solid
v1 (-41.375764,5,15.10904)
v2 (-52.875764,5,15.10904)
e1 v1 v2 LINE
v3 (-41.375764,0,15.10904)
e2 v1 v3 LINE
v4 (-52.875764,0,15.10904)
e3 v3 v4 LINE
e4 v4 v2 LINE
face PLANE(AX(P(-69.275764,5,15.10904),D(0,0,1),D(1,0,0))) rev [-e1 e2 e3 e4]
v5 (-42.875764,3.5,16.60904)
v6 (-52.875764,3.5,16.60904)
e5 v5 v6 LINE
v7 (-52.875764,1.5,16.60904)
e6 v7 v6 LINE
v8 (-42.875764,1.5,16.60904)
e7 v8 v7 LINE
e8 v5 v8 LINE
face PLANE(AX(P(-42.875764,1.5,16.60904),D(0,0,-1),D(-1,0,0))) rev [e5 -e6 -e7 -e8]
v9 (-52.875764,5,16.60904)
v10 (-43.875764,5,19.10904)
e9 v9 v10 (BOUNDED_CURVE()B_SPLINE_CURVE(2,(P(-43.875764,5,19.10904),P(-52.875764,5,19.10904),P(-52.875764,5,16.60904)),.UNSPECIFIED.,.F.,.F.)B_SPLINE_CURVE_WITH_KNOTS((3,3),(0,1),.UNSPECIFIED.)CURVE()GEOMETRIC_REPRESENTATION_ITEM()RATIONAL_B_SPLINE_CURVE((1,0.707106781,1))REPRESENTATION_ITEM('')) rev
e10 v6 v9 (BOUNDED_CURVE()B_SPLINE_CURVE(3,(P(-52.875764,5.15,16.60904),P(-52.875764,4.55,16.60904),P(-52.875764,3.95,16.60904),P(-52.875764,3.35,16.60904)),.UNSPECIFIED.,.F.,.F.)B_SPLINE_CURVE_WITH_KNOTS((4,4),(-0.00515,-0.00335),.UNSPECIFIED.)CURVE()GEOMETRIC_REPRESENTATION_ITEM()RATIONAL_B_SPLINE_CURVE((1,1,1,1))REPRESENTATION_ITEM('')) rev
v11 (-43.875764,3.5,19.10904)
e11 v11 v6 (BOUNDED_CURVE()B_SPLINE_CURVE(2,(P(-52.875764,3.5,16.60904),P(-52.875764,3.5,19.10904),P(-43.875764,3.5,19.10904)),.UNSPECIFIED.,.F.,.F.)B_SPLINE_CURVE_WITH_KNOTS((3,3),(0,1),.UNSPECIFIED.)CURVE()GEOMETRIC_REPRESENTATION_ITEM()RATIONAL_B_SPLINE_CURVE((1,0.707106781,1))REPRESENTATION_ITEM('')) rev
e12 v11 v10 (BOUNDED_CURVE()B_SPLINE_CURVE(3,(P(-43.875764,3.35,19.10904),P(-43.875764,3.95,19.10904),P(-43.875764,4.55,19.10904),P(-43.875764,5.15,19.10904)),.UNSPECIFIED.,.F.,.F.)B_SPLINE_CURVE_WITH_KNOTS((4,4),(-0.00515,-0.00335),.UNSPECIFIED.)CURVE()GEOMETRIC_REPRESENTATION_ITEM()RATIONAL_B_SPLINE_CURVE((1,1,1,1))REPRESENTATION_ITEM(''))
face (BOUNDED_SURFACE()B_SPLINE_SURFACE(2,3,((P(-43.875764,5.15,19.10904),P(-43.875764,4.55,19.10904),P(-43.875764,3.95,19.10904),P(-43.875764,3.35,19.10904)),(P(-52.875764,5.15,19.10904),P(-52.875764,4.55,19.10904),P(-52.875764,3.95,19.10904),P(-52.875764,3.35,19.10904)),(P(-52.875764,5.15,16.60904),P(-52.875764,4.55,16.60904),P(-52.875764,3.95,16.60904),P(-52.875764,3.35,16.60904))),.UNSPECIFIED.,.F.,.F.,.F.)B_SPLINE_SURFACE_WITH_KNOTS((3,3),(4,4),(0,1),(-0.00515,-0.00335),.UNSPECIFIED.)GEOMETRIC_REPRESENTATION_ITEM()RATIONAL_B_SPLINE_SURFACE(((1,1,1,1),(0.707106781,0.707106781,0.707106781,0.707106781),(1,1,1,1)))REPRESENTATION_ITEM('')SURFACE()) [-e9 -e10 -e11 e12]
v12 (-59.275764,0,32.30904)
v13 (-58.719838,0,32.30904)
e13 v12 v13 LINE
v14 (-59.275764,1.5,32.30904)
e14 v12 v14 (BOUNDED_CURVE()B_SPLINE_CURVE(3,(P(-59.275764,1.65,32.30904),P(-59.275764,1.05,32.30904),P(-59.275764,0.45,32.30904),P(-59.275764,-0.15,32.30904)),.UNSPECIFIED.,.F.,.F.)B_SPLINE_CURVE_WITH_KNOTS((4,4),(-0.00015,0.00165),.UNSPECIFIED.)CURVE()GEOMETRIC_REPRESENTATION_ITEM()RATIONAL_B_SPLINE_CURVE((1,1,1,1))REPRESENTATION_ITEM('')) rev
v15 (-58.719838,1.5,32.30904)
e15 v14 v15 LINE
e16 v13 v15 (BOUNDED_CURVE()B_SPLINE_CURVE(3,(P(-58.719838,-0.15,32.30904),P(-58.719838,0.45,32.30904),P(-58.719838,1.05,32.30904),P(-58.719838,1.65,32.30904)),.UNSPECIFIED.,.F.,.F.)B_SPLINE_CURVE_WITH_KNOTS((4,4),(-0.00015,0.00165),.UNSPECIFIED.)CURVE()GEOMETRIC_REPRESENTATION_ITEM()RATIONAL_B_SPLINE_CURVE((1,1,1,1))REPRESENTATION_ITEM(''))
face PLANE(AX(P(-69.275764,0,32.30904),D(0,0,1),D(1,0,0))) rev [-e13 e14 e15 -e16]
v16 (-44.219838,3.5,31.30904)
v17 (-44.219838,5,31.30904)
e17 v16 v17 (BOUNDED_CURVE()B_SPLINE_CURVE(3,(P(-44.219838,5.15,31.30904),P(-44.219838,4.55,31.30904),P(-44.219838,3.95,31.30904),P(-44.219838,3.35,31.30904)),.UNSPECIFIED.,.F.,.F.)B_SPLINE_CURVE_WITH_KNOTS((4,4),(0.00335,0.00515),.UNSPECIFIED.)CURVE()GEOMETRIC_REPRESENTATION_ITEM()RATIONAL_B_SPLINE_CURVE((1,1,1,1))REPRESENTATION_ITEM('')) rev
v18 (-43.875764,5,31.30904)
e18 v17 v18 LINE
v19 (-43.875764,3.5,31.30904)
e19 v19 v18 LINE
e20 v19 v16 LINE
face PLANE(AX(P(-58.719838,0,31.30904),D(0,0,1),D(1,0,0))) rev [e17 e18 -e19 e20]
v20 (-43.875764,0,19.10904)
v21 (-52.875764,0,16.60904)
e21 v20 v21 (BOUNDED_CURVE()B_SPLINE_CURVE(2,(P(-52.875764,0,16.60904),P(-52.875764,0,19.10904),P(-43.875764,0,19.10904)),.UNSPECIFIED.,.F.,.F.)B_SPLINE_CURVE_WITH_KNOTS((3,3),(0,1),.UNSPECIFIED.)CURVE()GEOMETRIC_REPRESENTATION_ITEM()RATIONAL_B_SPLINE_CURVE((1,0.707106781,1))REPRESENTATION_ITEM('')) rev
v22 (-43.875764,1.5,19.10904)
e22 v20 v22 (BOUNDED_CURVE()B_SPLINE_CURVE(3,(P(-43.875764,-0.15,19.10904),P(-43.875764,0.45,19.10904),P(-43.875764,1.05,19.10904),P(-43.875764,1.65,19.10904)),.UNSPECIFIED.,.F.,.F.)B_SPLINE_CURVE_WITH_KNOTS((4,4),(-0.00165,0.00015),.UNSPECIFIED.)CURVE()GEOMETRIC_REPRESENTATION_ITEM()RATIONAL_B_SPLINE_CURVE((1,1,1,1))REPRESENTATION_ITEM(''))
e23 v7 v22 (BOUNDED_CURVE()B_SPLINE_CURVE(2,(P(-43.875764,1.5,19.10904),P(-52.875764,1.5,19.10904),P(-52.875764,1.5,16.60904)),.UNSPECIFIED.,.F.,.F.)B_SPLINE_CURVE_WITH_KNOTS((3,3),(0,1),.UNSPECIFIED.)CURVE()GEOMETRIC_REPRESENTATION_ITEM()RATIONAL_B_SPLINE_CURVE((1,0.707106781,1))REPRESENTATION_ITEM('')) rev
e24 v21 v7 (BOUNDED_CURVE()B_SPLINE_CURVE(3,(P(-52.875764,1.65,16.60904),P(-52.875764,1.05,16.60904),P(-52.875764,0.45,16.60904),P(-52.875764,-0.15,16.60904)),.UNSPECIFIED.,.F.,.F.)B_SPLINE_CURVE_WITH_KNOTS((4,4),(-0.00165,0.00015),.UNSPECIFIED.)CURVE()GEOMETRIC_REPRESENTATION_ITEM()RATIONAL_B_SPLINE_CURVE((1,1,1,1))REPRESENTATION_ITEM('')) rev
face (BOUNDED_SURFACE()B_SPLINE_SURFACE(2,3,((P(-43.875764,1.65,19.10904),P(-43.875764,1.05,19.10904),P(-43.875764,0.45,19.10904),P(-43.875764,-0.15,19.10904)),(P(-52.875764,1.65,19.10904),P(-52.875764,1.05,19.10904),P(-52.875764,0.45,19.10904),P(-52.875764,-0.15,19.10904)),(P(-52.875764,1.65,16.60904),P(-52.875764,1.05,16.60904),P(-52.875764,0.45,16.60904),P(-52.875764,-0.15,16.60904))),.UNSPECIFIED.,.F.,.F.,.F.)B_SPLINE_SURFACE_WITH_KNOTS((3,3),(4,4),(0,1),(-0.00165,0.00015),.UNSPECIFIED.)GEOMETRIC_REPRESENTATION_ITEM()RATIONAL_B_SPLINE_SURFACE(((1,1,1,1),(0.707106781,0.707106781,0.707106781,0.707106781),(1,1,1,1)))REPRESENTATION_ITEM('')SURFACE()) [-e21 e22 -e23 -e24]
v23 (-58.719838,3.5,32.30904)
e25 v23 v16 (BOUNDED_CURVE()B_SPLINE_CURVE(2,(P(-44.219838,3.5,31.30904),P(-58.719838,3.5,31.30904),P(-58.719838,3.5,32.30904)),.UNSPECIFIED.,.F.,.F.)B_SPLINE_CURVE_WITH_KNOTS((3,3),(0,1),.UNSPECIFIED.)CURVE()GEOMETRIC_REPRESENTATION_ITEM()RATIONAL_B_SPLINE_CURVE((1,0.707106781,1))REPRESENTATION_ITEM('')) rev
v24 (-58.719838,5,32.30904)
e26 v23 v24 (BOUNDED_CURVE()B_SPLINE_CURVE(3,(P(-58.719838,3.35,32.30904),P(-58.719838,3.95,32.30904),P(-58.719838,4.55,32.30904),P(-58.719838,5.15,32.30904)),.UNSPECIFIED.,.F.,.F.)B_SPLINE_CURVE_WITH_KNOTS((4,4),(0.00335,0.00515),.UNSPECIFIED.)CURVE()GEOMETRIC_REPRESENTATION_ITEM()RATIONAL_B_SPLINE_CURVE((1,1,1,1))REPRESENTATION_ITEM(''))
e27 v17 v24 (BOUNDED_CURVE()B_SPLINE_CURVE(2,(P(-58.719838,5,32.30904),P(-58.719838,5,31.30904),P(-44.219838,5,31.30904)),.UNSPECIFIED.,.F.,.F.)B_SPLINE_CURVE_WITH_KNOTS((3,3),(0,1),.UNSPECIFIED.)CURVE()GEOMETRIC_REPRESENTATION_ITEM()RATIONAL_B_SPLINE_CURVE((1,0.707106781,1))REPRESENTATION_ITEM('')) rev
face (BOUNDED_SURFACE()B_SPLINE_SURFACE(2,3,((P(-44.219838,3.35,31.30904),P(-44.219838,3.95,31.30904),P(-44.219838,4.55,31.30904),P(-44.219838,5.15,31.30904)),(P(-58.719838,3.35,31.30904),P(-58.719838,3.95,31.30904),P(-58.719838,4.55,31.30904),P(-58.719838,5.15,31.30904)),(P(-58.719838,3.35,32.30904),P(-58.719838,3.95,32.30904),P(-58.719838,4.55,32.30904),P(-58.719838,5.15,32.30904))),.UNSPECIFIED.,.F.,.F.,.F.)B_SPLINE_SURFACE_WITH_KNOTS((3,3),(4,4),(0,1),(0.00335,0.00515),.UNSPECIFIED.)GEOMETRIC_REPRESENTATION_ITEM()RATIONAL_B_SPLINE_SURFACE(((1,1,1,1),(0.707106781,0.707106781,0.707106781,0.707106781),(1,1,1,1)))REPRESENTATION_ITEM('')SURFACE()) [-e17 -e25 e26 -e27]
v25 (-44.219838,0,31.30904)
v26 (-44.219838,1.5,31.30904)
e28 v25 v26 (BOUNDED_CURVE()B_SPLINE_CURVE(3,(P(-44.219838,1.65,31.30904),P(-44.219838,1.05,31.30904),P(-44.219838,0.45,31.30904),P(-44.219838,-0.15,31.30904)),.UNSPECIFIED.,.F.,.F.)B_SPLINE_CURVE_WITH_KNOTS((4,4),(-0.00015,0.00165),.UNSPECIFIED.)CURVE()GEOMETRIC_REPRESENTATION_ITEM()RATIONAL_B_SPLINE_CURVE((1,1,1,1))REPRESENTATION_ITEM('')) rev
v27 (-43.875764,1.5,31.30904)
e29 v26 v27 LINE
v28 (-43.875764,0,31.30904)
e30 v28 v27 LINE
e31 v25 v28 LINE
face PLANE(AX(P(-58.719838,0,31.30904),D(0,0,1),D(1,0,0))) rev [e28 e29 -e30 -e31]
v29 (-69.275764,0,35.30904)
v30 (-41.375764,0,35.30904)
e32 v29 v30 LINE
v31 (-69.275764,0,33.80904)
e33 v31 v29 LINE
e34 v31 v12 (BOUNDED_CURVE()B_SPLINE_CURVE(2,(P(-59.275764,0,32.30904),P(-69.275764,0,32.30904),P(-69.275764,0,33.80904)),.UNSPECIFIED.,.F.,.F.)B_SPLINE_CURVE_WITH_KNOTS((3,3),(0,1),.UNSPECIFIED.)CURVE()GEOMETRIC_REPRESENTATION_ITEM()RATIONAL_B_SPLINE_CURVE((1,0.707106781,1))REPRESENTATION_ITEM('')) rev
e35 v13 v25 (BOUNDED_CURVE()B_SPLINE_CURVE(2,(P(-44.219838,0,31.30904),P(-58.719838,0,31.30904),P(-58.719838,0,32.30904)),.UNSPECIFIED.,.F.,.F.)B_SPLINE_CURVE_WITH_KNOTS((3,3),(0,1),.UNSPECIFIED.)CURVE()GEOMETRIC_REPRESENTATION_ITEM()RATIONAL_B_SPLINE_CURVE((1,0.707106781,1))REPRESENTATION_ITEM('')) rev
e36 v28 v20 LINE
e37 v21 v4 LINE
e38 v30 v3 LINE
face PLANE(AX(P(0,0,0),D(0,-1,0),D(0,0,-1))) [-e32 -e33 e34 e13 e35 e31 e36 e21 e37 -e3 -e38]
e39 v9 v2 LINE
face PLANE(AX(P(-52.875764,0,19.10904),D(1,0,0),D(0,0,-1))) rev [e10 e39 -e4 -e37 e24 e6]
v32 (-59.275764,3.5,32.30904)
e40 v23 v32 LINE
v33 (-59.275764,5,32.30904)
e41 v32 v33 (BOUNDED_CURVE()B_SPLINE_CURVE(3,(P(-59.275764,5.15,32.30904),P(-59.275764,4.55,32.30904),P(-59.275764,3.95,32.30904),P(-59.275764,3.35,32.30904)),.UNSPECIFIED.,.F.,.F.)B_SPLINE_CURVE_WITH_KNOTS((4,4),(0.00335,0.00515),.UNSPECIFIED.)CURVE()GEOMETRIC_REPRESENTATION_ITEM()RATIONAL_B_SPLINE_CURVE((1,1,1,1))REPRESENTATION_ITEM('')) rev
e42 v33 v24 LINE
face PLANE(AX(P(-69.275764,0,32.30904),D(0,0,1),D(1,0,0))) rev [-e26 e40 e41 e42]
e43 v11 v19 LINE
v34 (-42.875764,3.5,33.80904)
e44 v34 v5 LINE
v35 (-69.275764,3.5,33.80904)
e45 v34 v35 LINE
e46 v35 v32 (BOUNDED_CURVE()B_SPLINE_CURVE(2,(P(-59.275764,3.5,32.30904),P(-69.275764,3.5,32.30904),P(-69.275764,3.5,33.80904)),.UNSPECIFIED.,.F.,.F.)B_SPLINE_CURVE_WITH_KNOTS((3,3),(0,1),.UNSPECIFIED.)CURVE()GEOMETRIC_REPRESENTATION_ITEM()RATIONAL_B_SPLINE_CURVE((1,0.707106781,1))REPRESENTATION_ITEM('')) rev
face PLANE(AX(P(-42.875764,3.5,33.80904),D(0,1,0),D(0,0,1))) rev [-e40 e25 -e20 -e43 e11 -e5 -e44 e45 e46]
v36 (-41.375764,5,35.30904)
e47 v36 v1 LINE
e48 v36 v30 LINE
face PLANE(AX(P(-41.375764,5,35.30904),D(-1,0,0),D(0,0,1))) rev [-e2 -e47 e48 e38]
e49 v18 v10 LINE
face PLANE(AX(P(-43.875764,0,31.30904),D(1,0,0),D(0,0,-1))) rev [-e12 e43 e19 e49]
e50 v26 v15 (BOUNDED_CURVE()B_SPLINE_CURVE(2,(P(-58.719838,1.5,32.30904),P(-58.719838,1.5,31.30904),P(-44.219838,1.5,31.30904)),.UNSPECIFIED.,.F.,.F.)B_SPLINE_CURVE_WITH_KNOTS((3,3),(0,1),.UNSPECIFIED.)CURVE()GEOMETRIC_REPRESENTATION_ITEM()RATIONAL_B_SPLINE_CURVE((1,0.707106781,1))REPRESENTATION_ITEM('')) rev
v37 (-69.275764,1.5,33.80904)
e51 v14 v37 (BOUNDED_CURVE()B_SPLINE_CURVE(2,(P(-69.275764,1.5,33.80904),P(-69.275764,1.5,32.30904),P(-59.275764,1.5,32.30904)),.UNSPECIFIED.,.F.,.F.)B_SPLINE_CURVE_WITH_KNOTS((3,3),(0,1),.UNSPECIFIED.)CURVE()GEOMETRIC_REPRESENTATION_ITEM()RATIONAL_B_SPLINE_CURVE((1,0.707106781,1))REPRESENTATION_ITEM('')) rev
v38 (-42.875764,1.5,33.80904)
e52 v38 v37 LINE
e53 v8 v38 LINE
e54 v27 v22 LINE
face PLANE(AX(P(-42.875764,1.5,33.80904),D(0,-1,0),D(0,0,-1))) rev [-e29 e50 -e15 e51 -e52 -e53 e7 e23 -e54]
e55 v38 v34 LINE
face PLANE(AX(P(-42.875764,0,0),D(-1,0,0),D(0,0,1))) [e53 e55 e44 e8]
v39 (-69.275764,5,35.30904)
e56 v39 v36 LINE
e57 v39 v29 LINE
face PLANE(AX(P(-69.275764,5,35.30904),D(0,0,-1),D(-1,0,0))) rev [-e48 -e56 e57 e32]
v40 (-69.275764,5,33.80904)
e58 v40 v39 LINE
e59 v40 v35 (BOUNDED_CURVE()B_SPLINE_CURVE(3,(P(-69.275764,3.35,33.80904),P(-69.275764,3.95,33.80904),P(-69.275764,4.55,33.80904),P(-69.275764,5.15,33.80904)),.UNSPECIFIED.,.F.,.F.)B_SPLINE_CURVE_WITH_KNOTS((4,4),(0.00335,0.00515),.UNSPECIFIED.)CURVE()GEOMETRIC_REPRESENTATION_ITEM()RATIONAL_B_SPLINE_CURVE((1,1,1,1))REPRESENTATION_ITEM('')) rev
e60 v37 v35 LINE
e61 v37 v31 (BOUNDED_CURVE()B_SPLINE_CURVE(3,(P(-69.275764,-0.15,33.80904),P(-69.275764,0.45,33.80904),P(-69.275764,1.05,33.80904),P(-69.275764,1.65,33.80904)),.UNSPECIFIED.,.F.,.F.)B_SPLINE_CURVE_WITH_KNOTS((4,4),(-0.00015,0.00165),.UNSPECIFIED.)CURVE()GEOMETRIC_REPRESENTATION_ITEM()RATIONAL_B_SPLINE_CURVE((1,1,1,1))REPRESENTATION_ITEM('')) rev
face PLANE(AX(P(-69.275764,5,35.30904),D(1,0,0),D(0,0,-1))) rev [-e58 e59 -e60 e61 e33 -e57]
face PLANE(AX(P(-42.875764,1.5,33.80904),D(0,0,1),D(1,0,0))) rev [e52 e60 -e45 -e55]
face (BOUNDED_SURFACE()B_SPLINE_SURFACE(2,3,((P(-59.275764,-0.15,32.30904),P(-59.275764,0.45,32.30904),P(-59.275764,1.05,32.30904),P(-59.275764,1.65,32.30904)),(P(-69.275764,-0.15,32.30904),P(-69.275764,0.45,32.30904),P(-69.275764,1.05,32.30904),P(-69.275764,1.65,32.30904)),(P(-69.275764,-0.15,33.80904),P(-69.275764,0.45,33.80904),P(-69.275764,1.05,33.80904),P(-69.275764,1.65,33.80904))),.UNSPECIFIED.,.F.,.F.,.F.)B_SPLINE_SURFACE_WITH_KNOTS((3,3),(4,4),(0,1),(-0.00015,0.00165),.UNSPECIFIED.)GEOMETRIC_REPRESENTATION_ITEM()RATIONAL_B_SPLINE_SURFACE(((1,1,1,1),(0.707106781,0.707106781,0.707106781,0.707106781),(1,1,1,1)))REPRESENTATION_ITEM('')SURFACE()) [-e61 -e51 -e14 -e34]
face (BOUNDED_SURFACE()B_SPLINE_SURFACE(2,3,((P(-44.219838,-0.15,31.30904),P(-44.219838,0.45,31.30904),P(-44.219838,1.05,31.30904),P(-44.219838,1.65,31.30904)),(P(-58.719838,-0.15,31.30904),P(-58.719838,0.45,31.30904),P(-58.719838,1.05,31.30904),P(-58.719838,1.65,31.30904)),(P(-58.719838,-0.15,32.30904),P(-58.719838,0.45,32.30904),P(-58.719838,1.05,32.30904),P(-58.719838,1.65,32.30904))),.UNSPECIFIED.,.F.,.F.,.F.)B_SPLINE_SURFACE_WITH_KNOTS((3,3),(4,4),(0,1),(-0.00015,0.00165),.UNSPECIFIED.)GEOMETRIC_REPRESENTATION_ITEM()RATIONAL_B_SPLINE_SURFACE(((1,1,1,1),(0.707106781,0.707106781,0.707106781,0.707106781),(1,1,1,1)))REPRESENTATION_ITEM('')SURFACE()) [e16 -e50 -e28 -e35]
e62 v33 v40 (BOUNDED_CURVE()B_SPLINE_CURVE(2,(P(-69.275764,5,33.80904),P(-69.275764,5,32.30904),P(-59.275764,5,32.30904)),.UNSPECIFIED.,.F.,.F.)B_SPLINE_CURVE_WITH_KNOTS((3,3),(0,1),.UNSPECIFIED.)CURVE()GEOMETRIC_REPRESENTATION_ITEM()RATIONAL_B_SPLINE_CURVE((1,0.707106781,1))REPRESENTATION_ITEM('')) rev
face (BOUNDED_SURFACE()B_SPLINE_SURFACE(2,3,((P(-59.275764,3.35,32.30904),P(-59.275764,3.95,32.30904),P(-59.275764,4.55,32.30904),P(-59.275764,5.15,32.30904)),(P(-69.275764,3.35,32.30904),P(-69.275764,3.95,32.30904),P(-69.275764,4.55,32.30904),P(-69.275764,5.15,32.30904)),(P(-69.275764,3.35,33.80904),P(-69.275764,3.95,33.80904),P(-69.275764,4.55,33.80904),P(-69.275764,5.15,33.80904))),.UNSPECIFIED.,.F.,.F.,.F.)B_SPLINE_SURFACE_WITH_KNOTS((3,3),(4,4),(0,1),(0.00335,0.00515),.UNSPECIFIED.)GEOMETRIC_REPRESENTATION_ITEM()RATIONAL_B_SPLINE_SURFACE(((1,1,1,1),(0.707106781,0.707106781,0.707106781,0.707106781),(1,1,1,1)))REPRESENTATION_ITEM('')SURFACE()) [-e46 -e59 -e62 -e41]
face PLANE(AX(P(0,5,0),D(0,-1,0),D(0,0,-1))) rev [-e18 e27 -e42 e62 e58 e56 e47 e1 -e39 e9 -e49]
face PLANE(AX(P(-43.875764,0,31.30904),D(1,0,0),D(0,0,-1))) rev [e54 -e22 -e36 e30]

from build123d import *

# Parameters (mm, degrees)
SKETCH1_W           = 27.9
SKETCH1_H           = 20.2
BOSS_EXTRUDE2_DEPTH = 5
CUT_EXTRUDE3_DEPTH  = 5
SKETCH5_W           = 17.2
SKETCH5_H           = 2
CUT_EXTRUDE4_DEPTH  = 26.4
FILLET1_SIZE        = 2.5
FILLET1_SIZE_2      = 9
FILLET2_SIZE        = 9
FILLET2_SIZE_2      = 2.5
FILLET3_SIZE        = 1
FILLET3_SIZE_2      = 14.5
FILLET4_DEPTH       = 1.5
FILLET5_START       = 3.5
FILLET5_DEPTH       = 1.5
FILLET6_DEPTH       = 1.5


with BuildPart() as part:
    # Sketch1 → Boss-Extrude2 (new body)
    with BuildSketch(Plane(origin=(0, 0, 0), x_dir=(1, 0, 0), z_dir=(0, 1, 0))):
        with Locations((-55.325764497, -25.209039536)):
            Rectangle(SKETCH1_W, SKETCH1_H)
    extrude(amount=BOSS_EXTRUDE2_DEPTH)

    # Sketch4 → Cut-Extrude3 (cut)
    with BuildSketch(Plane(origin=(0, 5, 0), x_dir=(1, 0, 0), z_dir=(0, 1, 0))):
        Polygon((-69.275764497, -32.309039536), (-58.719837606, -32.309039536), (-58.719837606, -31.309039536), (-43.875764497, -31.309039536), (-43.875764497, -19.109039536), (-52.875764497, -19.109039536), (-52.875764497, -15.109039536), (-69.275764497, -15.109039536), align=None)
    extrude(amount=-CUT_EXTRUDE3_DEPTH, mode=Mode.SUBTRACT)

    # Sketch5 → Cut-Extrude4 (cut)
    with BuildSketch(Plane.ZY.offset(69.275764497)):
        with Locations((25.209039536, 2.5)):
            Rectangle(SKETCH5_W, SKETCH5_H)
    extrude(amount=-CUT_EXTRUDE4_DEPTH, mode=Mode.SUBTRACT)

    # Fillet1
    # a fillet whose section is not a circle: 9, 2.5 mm, written as the material it takes off along each edge
    with BuildSketch(Plane(origin=(-52.875764497, 27.5, 19.109039536), x_dir=(0, 0, -1), z_dir=(0, -1, 0))) as fillet1_piece_1_section:
        with BuildLine():
            Bezier((FILLET1_SIZE, 0), (0, 0), (0, FILLET1_SIZE_2), weights=[1, 0.707106781, 1])
            Line((0, FILLET1_SIZE_2), (0, 0))
            Line((0, 0), (FILLET1_SIZE, 0))
        make_face()
    fillet1_piece_1 = extrude(amount=46.5, mode=Mode.PRIVATE)
    fillet1_piece_1 = split(fillet1_piece_1, bisect_by=Plane(origin=(-52.875764497, 1.5, 19.109039536), z_dir=(0, 1, 0)), keep=Keep.TOP, mode=Mode.PRIVATE)
    add(fillet1_piece_1, mode=Mode.SUBTRACT)

    # Fillet2
    # a fillet whose section is not a circle: 9, 2.5 mm, written as the material it takes off along each edge
    with BuildSketch(Plane(origin=(-52.875764497, 24, 19.109039536), x_dir=(1, 0, 0), z_dir=(0, -1, 0))) as fillet2_piece_1:
        with BuildLine():
            Bezier((FILLET2_SIZE, 0), (0, 0), (0, -FILLET2_SIZE_2), weights=[1, 0.707106781, 1])
            Line((0, -FILLET2_SIZE_2), (0, 0))
            Line((0, 0), (FILLET2_SIZE, 0))
        make_face()
    extrude(amount=46.5, mode=Mode.SUBTRACT)

    # Fillet3
    # a fillet whose section is not a circle: 14.5, 1 mm, written as the material it takes off along each edge
    with BuildSketch(Plane(origin=(-58.719837606, 41.25, 31.309039536), x_dir=(0, 0, 1), z_dir=(0, -1, 0))) as fillet3_piece_1_section:
        with BuildLine():
            Bezier((FILLET3_SIZE, 0), (0, 0), (0, -FILLET3_SIZE_2), weights=[1, 0.707106781, 1])
            Line((0, -FILLET3_SIZE_2), (0, 0))
            Line((0, 0), (FILLET3_SIZE, 0))
        make_face()
    fillet3_piece_1 = extrude(amount=74, mode=Mode.PRIVATE)
    fillet3_piece_1 = split(fillet3_piece_1, bisect_by=Plane(origin=(-58.719837606, 1.5, 31.309039536), z_dir=(0, 1, 0)), keep=Keep.TOP, mode=Mode.PRIVATE)
    add(fillet3_piece_1, mode=Mode.SUBTRACT)

    # Fillet4: read off the stored shape, not the designer's step
    # Fillet4 outline → Fillet4 (cut)
    with BuildSketch(Plane(origin=(0, 0, 0), x_dir=(1, 0, 0), z_dir=(0, 1, 0))):
        with BuildLine():
            add(Edge.make_bspline(
                [(-44.219837606, -31.309039536), (-58.719837606, -31.309039536), (-58.719837606, -32.309039536)],
                knots=[0, 0, 0, 1, 1, 1], degree=2, weights=[1, 0.707106781, 1]))
            Line((-44.219837606, -31.309039536), (-58.719837606, -31.309039536))
            Line((-58.719837606, -31.309039536), (-58.719837606, -32.309039536))
        make_face()
    extrude(amount=FILLET4_DEPTH, mode=Mode.SUBTRACT)

    # Fillet5: read off the stored shape, not the designer's step
    # Fillet5 outline → Fillet5 (cut)
    with BuildSketch(Plane(origin=(0, 0, 0), x_dir=(1, 0, 0), z_dir=(0, 1, 0)).offset(FILLET5_START)):
        with BuildLine():
            add(Edge.make_bspline(
                [(-59.275764497, -32.309039536), (-69.275764497, -32.309039536), (-69.275764497, -33.809039536)],
                knots=[0, 0, 0, 1, 1, 1], degree=2, weights=[1, 0.707106781, 1]))
            Line((-59.275764497, -32.309039536), (-69.275764497, -32.309039536))
            Line((-69.275764497, -32.309039536), (-69.275764497, -33.809039536))
        make_face()
    extrude(amount=FILLET5_DEPTH, mode=Mode.SUBTRACT)

    # Fillet6: read off the stored shape, not the designer's step
    # Fillet6 outline → Fillet6 (cut)
    with BuildSketch(Plane(origin=(0, 0, 0), x_dir=(1, 0, 0), z_dir=(0, 1, 0))):
        with BuildLine():
            add(Edge.make_bspline(
                [(-59.275764497, -32.309039536), (-69.275764497, -32.309039536), (-69.275764497, -33.809039536)],
                knots=[0, 0, 0, 1, 1, 1], degree=2, weights=[1, 0.707106781, 1]))
            Line((-59.275764497, -32.309039536), (-69.275764497, -32.309039536))
            Line((-69.275764497, -32.309039536), (-69.275764497, -33.809039536))
        make_face()
    extrude(amount=FILLET6_DEPTH, mode=Mode.SUBTRACT)


solid = part.part
